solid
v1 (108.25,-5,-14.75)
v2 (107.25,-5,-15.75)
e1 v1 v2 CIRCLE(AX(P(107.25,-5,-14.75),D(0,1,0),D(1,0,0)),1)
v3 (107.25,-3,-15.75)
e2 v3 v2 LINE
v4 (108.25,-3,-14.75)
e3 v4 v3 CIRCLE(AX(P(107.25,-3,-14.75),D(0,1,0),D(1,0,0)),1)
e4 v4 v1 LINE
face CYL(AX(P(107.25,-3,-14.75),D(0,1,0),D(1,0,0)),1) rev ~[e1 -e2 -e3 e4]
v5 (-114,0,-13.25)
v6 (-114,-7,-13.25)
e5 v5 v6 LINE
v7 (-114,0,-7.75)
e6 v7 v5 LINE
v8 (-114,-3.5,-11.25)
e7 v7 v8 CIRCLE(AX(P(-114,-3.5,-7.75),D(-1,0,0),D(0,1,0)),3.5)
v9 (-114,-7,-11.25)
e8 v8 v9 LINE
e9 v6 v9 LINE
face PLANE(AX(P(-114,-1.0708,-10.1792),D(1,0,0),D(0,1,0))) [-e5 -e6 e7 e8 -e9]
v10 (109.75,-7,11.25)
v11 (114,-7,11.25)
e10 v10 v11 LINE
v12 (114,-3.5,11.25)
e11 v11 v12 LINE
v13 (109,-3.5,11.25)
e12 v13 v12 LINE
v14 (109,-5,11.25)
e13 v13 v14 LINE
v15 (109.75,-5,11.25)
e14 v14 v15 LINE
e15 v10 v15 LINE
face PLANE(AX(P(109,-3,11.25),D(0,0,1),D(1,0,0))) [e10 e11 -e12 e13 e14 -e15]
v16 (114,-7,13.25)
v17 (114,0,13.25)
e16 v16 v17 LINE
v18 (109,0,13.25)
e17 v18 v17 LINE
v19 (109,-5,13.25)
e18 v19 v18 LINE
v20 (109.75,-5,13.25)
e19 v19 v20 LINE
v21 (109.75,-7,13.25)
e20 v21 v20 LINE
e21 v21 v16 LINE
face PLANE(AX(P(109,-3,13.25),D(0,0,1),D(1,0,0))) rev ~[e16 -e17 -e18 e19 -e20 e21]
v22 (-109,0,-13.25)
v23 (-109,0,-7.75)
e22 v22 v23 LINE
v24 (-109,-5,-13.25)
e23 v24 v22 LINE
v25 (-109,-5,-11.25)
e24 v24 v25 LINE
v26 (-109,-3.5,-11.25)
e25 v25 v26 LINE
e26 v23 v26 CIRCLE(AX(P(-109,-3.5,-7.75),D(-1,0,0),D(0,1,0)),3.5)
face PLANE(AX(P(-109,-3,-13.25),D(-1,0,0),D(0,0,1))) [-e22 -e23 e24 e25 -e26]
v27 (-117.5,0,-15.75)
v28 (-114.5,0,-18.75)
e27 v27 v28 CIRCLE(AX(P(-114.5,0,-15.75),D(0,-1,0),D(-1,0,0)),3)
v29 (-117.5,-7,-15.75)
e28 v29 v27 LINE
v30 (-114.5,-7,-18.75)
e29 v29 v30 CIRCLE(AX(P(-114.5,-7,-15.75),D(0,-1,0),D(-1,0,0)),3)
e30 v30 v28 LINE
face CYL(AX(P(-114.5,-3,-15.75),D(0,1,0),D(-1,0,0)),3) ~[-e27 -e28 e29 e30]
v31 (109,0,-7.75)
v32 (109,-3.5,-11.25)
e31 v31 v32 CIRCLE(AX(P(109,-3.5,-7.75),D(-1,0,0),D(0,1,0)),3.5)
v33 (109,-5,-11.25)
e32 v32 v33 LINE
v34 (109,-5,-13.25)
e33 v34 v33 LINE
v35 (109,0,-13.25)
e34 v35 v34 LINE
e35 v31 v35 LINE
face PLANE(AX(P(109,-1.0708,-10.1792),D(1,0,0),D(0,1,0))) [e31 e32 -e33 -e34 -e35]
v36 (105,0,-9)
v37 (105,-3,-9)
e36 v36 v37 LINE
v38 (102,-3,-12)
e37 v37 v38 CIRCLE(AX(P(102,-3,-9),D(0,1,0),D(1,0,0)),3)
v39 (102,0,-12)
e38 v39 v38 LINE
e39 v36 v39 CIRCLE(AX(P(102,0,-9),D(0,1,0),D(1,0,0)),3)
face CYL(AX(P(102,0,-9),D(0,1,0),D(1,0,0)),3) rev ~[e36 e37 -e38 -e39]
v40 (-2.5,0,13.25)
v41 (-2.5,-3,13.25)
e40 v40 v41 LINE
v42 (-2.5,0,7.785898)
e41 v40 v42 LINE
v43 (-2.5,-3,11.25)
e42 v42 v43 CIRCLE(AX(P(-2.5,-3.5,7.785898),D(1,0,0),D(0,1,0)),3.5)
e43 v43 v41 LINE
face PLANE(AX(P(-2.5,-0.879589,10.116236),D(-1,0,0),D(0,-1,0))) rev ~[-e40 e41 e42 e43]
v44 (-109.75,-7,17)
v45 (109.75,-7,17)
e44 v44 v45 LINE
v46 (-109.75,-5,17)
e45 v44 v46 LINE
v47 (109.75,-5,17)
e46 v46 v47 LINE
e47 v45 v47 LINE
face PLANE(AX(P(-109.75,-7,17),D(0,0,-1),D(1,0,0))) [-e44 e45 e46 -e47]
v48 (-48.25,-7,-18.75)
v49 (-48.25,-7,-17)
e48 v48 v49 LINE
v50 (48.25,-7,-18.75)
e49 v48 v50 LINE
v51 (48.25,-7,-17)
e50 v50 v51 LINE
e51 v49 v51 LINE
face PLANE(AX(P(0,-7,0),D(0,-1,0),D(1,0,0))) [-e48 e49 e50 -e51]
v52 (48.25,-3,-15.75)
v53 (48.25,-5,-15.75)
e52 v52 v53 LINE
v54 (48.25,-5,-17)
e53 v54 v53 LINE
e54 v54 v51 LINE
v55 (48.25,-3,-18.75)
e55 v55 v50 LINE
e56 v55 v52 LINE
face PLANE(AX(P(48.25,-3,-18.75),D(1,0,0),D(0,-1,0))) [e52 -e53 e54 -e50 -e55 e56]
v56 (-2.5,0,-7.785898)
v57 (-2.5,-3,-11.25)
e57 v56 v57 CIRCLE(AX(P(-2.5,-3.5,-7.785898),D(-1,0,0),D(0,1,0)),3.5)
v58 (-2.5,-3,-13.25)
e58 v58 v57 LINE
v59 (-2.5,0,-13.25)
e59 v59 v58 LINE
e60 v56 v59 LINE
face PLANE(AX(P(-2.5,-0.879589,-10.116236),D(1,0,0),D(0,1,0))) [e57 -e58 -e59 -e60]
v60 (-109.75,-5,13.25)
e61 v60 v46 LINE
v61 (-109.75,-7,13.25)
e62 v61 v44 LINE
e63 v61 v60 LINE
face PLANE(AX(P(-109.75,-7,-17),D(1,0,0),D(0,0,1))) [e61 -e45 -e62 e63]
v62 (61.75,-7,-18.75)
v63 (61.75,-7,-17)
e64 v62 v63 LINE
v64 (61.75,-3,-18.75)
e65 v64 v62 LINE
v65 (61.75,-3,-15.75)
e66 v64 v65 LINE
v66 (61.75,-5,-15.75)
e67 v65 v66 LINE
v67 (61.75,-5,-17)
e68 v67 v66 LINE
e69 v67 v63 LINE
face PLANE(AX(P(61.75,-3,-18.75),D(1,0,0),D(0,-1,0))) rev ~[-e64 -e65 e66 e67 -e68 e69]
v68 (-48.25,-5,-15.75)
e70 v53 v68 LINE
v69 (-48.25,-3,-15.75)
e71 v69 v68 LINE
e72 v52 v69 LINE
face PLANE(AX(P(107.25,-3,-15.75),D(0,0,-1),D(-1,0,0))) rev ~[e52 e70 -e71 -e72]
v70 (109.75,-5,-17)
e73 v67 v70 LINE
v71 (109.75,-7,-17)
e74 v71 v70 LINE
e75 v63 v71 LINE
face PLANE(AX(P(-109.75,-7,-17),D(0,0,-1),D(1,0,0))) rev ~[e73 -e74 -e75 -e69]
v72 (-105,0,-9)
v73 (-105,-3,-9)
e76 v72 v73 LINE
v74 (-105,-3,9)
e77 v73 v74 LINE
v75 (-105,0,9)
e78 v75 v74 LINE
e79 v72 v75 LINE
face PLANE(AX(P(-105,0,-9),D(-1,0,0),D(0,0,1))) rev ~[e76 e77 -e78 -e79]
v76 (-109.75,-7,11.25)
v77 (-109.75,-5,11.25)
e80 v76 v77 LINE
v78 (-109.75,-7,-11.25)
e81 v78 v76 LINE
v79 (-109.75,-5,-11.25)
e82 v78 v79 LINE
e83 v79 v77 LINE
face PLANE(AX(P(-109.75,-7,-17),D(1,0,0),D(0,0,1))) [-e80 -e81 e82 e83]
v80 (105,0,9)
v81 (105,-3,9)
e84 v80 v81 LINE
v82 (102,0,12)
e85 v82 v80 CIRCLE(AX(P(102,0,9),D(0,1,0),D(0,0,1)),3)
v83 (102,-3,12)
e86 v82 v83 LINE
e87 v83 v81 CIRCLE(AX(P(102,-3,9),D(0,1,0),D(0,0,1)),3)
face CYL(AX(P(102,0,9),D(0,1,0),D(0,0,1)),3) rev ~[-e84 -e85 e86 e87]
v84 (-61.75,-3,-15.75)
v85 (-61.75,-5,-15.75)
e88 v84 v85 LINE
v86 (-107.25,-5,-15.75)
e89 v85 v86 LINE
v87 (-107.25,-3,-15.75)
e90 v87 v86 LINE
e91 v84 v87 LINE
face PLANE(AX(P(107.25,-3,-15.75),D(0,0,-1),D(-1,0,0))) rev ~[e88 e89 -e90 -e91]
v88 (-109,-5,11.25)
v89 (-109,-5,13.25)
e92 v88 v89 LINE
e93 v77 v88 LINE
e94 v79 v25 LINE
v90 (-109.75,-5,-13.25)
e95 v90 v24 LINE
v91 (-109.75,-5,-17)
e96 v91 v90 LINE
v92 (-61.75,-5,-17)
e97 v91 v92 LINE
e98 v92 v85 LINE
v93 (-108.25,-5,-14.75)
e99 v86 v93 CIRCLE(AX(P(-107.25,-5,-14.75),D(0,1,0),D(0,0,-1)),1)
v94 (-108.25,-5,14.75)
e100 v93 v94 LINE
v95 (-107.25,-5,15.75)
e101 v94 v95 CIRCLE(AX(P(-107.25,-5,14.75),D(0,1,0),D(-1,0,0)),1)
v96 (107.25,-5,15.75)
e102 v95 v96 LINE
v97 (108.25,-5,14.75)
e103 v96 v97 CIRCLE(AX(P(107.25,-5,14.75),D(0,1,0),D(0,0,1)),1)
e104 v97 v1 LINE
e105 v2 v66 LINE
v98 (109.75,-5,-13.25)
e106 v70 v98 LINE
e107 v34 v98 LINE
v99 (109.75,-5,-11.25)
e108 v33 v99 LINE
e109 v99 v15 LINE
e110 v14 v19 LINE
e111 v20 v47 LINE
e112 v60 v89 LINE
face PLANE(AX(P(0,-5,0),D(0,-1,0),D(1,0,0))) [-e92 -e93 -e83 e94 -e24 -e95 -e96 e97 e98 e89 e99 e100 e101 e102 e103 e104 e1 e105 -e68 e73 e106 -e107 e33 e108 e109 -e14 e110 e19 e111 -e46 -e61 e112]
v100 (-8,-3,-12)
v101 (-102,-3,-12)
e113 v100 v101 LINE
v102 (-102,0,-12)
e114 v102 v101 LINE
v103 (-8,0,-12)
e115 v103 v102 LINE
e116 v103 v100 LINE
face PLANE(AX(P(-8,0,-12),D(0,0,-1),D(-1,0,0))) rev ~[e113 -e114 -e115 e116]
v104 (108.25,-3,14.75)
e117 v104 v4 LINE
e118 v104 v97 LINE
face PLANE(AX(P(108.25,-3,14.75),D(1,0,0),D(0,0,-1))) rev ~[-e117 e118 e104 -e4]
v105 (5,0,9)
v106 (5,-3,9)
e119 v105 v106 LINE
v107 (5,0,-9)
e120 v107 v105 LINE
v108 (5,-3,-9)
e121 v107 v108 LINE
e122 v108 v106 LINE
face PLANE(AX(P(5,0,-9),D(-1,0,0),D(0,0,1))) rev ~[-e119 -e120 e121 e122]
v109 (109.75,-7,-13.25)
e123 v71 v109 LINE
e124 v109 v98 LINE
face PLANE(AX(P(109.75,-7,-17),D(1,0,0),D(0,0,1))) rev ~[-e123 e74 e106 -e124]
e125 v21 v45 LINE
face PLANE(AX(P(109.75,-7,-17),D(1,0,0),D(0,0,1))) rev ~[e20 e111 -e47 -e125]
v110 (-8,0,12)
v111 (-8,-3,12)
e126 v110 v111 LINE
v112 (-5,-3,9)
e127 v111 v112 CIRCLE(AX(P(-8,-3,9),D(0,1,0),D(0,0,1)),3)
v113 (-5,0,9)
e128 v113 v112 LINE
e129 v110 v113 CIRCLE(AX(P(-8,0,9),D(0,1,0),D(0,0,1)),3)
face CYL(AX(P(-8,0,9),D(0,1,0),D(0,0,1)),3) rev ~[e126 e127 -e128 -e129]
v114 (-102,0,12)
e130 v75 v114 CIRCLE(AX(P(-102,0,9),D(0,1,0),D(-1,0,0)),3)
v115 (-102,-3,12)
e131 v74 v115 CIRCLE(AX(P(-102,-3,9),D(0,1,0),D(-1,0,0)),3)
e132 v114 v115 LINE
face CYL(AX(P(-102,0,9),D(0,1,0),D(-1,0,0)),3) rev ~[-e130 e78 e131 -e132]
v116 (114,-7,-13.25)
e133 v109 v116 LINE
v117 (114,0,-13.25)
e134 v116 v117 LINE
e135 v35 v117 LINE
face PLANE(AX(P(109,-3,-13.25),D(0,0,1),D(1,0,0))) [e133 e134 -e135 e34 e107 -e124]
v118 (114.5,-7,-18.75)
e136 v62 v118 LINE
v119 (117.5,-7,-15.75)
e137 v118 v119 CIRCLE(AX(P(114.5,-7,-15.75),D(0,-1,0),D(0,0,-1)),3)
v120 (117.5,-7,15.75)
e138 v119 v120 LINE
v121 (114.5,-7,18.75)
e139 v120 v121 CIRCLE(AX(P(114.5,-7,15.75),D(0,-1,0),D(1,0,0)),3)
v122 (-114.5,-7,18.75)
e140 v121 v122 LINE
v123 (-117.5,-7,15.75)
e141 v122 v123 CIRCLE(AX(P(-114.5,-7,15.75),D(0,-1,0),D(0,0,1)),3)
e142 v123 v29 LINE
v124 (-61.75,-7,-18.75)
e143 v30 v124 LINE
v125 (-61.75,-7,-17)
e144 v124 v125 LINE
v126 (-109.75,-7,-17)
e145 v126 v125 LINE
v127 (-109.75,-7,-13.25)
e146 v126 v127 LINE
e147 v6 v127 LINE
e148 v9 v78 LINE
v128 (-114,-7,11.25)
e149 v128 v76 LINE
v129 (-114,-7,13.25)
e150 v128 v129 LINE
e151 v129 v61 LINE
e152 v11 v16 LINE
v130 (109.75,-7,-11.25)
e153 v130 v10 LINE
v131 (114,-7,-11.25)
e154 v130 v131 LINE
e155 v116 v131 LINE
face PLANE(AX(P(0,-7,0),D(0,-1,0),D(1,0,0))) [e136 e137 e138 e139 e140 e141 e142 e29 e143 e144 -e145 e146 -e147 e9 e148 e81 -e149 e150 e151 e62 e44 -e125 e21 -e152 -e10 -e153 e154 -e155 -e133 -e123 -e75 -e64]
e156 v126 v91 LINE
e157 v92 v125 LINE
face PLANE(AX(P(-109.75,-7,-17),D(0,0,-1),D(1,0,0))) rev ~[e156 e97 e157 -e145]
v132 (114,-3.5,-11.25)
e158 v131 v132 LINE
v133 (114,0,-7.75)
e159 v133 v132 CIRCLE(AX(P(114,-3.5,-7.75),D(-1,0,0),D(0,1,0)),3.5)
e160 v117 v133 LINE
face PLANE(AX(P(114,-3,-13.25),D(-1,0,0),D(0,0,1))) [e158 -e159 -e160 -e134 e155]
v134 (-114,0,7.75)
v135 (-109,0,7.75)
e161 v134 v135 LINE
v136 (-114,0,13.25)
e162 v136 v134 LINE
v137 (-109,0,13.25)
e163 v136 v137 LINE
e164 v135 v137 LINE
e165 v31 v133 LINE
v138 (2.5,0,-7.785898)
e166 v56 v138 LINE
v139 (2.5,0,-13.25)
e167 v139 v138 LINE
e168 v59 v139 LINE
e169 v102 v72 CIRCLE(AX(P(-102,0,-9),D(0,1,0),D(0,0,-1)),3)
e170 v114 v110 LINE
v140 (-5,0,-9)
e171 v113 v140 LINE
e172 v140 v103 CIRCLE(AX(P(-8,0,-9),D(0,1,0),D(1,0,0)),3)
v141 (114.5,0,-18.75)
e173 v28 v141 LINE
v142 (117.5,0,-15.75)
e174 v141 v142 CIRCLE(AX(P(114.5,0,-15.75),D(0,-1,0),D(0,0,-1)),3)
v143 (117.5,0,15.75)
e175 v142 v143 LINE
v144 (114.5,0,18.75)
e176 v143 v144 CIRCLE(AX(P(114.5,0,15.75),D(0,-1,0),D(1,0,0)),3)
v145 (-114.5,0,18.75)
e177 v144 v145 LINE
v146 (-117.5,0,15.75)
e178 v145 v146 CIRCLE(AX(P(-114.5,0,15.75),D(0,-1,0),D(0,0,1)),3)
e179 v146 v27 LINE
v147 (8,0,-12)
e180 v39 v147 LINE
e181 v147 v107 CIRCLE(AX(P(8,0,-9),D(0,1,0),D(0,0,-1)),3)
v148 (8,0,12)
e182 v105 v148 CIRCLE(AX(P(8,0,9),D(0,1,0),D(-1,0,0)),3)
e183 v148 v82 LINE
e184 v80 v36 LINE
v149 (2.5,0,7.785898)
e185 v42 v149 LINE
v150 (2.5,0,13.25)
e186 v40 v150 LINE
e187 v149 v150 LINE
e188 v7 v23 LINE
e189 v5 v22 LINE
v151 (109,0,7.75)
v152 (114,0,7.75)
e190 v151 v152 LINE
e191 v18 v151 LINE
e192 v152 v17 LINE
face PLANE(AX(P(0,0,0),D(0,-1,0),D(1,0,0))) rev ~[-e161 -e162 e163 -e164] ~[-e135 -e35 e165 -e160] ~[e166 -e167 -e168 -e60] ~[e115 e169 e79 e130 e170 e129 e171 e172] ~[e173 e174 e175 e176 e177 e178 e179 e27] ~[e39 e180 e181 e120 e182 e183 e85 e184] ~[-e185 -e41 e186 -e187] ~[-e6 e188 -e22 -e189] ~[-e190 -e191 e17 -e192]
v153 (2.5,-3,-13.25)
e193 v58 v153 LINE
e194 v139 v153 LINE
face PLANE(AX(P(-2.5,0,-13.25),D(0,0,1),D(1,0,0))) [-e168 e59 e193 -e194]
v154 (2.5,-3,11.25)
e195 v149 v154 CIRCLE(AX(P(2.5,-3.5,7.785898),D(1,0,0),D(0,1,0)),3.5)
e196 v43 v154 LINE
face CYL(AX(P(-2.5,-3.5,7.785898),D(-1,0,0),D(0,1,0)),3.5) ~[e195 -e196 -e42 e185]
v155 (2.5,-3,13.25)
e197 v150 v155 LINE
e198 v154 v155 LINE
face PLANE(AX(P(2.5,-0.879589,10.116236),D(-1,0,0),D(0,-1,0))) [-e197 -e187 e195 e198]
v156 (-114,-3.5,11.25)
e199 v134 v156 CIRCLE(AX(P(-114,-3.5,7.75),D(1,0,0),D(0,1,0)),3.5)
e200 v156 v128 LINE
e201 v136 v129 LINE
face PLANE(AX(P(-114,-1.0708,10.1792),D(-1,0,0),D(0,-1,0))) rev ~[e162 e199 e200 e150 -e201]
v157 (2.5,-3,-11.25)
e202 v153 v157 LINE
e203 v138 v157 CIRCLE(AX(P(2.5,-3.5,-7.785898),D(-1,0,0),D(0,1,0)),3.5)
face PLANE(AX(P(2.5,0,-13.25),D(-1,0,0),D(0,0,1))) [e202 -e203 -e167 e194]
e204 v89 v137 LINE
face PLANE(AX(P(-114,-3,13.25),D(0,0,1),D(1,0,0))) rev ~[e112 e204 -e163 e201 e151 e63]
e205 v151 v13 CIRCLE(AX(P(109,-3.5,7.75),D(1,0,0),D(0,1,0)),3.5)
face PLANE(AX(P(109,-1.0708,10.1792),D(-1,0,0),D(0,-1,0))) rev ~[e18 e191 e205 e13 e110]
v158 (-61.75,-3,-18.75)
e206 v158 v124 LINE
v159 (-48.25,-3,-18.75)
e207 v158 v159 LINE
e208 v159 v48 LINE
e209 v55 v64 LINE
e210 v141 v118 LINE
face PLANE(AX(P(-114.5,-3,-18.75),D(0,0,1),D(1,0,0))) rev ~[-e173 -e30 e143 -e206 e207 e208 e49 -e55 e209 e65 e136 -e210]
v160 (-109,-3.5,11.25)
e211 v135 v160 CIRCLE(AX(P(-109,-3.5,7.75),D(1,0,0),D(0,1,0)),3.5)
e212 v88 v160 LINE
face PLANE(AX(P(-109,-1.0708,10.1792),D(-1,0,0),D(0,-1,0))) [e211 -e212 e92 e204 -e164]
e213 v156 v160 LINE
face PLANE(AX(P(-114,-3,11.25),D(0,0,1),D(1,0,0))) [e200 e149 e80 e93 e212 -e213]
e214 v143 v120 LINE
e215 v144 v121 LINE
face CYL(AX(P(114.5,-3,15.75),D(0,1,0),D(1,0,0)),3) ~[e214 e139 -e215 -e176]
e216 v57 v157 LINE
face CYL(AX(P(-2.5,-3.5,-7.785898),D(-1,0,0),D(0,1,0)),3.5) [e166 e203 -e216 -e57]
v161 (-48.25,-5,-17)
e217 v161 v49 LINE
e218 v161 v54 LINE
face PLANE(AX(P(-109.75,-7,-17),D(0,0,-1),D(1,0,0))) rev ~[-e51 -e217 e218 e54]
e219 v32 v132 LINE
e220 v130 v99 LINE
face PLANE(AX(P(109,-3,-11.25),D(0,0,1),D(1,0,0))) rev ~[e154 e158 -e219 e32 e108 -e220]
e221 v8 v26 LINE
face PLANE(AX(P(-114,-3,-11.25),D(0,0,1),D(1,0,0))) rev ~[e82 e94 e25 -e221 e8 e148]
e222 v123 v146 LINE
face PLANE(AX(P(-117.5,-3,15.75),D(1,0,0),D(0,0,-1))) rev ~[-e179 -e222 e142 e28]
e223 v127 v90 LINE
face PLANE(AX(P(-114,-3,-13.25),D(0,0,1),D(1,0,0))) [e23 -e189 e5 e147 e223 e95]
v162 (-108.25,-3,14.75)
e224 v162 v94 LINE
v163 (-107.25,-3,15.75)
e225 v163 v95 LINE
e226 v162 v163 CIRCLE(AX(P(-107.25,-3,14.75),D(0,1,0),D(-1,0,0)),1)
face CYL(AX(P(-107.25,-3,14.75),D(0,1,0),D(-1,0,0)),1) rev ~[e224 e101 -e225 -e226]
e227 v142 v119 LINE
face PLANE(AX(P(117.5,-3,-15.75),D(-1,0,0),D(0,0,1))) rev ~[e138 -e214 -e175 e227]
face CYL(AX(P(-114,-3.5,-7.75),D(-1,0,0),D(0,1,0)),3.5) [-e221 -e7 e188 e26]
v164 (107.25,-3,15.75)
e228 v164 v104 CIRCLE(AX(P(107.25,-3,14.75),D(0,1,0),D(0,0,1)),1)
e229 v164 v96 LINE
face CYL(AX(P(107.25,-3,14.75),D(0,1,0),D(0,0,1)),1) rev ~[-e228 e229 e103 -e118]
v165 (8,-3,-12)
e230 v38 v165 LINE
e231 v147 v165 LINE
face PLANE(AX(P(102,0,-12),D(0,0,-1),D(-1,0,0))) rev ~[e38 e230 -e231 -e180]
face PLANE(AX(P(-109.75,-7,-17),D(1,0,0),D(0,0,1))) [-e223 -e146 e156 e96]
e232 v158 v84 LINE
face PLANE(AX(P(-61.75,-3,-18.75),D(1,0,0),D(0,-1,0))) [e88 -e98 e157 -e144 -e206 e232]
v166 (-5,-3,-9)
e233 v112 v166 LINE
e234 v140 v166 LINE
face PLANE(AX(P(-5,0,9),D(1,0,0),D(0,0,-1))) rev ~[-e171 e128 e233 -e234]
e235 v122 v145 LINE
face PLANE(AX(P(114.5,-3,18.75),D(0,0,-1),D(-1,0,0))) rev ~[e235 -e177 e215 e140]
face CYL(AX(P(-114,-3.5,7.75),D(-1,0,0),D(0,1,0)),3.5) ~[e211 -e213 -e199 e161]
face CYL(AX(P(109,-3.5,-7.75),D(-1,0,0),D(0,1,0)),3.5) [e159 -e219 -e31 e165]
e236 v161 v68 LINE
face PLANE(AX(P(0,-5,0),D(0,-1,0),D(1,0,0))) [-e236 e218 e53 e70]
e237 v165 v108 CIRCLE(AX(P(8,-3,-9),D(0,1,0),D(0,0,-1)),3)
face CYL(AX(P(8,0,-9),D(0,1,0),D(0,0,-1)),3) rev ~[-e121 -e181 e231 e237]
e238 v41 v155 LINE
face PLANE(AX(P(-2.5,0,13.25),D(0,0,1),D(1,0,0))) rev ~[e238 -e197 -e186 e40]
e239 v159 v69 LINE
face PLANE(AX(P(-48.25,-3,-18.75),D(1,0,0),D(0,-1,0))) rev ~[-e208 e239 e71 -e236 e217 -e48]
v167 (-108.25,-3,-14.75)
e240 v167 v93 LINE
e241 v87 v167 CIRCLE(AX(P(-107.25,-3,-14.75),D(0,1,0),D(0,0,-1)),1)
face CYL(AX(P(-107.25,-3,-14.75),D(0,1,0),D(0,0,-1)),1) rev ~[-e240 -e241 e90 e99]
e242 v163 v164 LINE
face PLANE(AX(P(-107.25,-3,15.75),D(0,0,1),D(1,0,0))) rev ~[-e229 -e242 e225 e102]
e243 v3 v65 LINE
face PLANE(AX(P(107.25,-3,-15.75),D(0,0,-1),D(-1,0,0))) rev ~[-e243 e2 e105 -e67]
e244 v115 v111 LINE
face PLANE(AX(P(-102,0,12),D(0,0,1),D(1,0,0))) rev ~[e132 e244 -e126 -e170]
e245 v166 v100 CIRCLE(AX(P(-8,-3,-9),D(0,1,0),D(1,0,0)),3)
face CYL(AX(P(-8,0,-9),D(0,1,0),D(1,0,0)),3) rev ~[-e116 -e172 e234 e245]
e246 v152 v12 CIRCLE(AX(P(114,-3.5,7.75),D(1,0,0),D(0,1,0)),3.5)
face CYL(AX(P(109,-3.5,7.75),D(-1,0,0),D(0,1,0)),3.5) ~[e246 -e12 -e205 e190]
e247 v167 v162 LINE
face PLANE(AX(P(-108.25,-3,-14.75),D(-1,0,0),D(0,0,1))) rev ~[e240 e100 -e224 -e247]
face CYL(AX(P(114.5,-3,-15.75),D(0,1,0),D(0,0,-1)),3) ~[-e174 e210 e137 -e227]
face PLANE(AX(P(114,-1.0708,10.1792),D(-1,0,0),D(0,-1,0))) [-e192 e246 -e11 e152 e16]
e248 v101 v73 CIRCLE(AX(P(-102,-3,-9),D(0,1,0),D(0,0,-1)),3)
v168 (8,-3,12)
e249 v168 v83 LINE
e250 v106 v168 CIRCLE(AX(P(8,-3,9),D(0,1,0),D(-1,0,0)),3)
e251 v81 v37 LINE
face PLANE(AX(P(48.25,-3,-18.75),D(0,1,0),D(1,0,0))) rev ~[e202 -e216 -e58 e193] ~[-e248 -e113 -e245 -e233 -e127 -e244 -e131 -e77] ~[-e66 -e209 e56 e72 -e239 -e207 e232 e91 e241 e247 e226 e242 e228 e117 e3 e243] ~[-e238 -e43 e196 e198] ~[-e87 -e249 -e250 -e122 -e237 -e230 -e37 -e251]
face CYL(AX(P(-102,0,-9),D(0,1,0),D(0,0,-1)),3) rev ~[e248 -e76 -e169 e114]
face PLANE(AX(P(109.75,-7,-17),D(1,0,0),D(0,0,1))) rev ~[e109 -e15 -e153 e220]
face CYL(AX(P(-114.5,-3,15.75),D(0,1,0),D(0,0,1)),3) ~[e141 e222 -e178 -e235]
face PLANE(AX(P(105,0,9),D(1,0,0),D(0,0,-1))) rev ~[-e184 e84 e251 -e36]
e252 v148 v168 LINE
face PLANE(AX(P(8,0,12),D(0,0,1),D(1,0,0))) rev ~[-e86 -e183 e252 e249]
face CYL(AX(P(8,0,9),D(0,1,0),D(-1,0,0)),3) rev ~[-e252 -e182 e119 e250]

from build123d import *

# Parameters (mm, degrees)
F0_W        = 5
F0_H        = 2
F1_DEPTH    = 3
F2_W        = 5
F2_H        = 2
F3_DEPTH    = 4
F4_W        = 219.5
F4_H        = 34
F4_W_2      = 214.53166008
F4_H_2      = 28.9933998138
F5_DEPTH    = 2
F6_W        = 13.5
F6_H        = 4
F7_DEPTH    = 25
F8_T1_DEPTH = 5
F8_T3_DEPTH = 5
F8_T5_DEPTH = 5


# Not quite as in the source:
# - a fillet or chamfer that OpenCascade refuses, or shapes differently, is made with other operations: its cross-section is extruded or revolved along the edge and cut away or added
# - a feature names something its author has since deleted; it is built from what else it names


with BuildPart() as f1:
    # F0 (on Front) → F1 (new body)
    with BuildSketch(Plane.XZ):
        with BuildLine():
            ThreePointArc((117.5, 15.75), (116.6213203436, 17.8713203436), (114.5, 18.75))
            Line((114.5, 18.75), (-114.5, 18.75))
            ThreePointArc((-114.5, 18.75), (-116.6213203436, 17.8713203436), (-117.5, 15.75))
            Line((-117.5, 15.75), (-117.5, -15.75))
            ThreePointArc((-117.5, -15.75), (-116.6213203436, -17.8713203436), (-114.5, -18.75))
            Line((-114.5, -18.75), (114.5, -18.75))
            ThreePointArc((114.5, -18.75), (116.6213203436, -17.8713203436), (117.5, -15.75))
            Line((117.5, -15.75), (117.5, 15.75))
        make_face()
        with Locations((-111.5, -12.25)):
            Rectangle(F0_W, F0_H, mode=Mode.SUBTRACT)
        with Locations((0, -12.25)):
            Rectangle(F0_W, F0_H, mode=Mode.SUBTRACT)
        with Locations((111.5, -12.25)):
            Rectangle(F0_W, F0_H, mode=Mode.SUBTRACT)
        with BuildLine():
            Line((-102, 12), (-8, 12))
            ThreePointArc((-8, 12), (-5.8786796564, 11.1213203436), (-5, 9))
            Line((-5, 9), (-5, -9))
            ThreePointArc((-5, -9), (-5.8786796564, -11.1213203436), (-8, -12))
            Line((-8, -12), (-102, -12))
            ThreePointArc((-102, -12), (-104.1213203436, -11.1213203436), (-105, -9))
            Line((-105, -9), (-105, 9))
            ThreePointArc((-105, 9), (-104.1213203436, 11.1213203436), (-102, 12))
        make_face(mode=Mode.SUBTRACT)
        with Locations((-111.5, 12.25)):
            Rectangle(F0_W, F0_H, mode=Mode.SUBTRACT)
        with BuildLine():
            Line((8, 12), (102, 12))
            ThreePointArc((102, 12), (104.1213203436, 11.1213203436), (105, 9))
            Line((105, 9), (105, -9))
            ThreePointArc((105, -9), (104.1213203436, -11.1213203436), (102, -12))
            Line((102, -12), (8, -12))
            ThreePointArc((8, -12), (5.8786796564, -11.1213203436), (5, -9))
            Line((5, -9), (5, 9))
            ThreePointArc((5, 9), (5.8786796564, 11.1213203436), (8, 12))
        make_face(mode=Mode.SUBTRACT)
        with Locations((0, 12.25)):
            Rectangle(F0_W, F0_H, mode=Mode.SUBTRACT)
        with Locations((111.5, 12.25)):
            Rectangle(F0_W, F0_H, mode=Mode.SUBTRACT)
    extrude(amount=F1_DEPTH)

    # F2 (on face) → F3 (join)
    with BuildSketch(Plane.XZ.offset(3)):
        with BuildLine():
            Line((-114.5, -18.75), (114.5, -18.75))
            ThreePointArc((114.5, -18.75), (116.6213203436, -17.8713203436), (117.5, -15.75))
            Line((117.5, -15.75), (117.5, 15.75))
            ThreePointArc((117.5, 15.75), (116.6213203436, 17.8713203436), (114.5, 18.75))
            Line((114.5, 18.75), (-114.5, 18.75))
            ThreePointArc((-114.5, 18.75), (-116.6213203436, 17.8713203436), (-117.5, 15.75))
            Line((-117.5, 15.75), (-117.5, -15.75))
            ThreePointArc((-117.5, -15.75), (-116.6213203436, -17.8713203436), (-114.5, -18.75))
        make_face()
        with Locations((-111.5, -12.25)):
            Rectangle(F2_W, F2_H, mode=Mode.SUBTRACT)
        with Locations((111.5, -12.25)):
            Rectangle(F2_W, F2_H, mode=Mode.SUBTRACT)
        with BuildLine():
            Line((-107.25, 15.75), (107.25, 15.75))
            ThreePointArc((107.25, 15.75), (107.9571067812, 15.4571067812), (108.25, 14.75))
            Line((108.25, 14.75), (108.25, -14.75))
            ThreePointArc((108.25, -14.75), (107.9571067812, -15.4571067812), (107.25, -15.75))
            Line((107.25, -15.75), (-107.25, -15.75))
            ThreePointArc((-107.25, -15.75), (-107.9571067812, -15.4571067812), (-108.25, -14.75))
            Line((-108.25, -14.75), (-108.25, 14.75))
            ThreePointArc((-108.25, 14.75), (-107.9571067812, 15.4571067812), (-107.25, 15.75))
        make_face(mode=Mode.SUBTRACT)
        with Locations((-111.5, 12.25)):
            Rectangle(F2_W, F2_H, mode=Mode.SUBTRACT)
        with Locations((111.5, 12.25)):
            Rectangle(F2_W, F2_H, mode=Mode.SUBTRACT)
    extrude(amount=F3_DEPTH)

    # F4 (on face) → F5 (cut)
    with BuildSketch(Plane.XZ.offset(7)):
        Rectangle(F4_W, F4_H)
        Rectangle(F4_W_2, F4_H_2, mode=Mode.SUBTRACT)
    extrude(amount=-F5_DEPTH, mode=Mode.SUBTRACT)

    # F6 (on face) → F7 (cut)
    with BuildSketch(Plane(origin=(0, 0, -18.75), x_dir=(1, 0, 0), z_dir=(0, 0, -1))):
        with Locations((-55, 5)):
            Rectangle(F6_W, F6_H)
        with Locations((55, 5)):
            Rectangle(F6_W, F6_H)
    extrude(amount=-F7_DEPTH, mode=Mode.SUBTRACT)

    # F8: fillet of radius 3.5 on 6 edges, made by hand

    # F8_s2 → F8_t1 (cut)
    with BuildSketch(Plane.YZ.offset(-2.5)):
        with BuildLine():
            ThreePointArc((0, 7.7858983849), (-0.8542486889, 10.0771862323), (-3, 11.25))
            Line((-3, 11.25), (0, 11.25))
            Line((0, 11.25), (0, 7.7858983849))
        make_face()
        with BuildLine():
            ThreePointArc((0, -7.7858983849), (-0.8542486889, -10.0771862323), (-3, -11.25))
            Line((-3, -11.25), (0, -11.25))
            Line((0, -11.25), (0, -7.7858983849))
        make_face()
    extrude(amount=F8_T1_DEPTH, mode=Mode.SUBTRACT)

    # F8_s4 → F8_t3 (cut)
    with BuildSketch(Plane.YZ.offset(109)):
        with BuildLine():
            ThreePointArc((0, 7.75), (-1.0251262658, 10.2248737342), (-3.5, 11.25))
            Line((-3.5, 11.25), (0, 11.25))
            Line((0, 11.25), (0, 7.75))
        make_face()
        with BuildLine():
            ThreePointArc((0, -7.75), (-1.0251262658, -10.2248737342), (-3.5, -11.25))
            Line((-3.5, -11.25), (0, -11.25))
            Line((0, -11.25), (0, -7.75))
        make_face()
    extrude(amount=F8_T3_DEPTH, mode=Mode.SUBTRACT)

    # F8_s6 → F8_t5 (cut)
    with BuildSketch(Plane.YZ.offset(-114)):
        with BuildLine():
            ThreePointArc((0, -7.75), (-1.0251262658, -10.2248737342), (-3.5, -11.25))
            Line((-3.5, -11.25), (0, -11.25))
            Line((0, -11.25), (0, -7.75))
        make_face()
        with BuildLine():
            ThreePointArc((0, 7.75), (-1.0251262658, 10.2248737342), (-3.5, 11.25))
            Line((-3.5, 11.25), (0, 11.25))
            Line((0, 11.25), (0, 7.75))
        make_face()
    extrude(amount=F8_T5_DEPTH, mode=Mode.SUBTRACT)


solid = f1.part
